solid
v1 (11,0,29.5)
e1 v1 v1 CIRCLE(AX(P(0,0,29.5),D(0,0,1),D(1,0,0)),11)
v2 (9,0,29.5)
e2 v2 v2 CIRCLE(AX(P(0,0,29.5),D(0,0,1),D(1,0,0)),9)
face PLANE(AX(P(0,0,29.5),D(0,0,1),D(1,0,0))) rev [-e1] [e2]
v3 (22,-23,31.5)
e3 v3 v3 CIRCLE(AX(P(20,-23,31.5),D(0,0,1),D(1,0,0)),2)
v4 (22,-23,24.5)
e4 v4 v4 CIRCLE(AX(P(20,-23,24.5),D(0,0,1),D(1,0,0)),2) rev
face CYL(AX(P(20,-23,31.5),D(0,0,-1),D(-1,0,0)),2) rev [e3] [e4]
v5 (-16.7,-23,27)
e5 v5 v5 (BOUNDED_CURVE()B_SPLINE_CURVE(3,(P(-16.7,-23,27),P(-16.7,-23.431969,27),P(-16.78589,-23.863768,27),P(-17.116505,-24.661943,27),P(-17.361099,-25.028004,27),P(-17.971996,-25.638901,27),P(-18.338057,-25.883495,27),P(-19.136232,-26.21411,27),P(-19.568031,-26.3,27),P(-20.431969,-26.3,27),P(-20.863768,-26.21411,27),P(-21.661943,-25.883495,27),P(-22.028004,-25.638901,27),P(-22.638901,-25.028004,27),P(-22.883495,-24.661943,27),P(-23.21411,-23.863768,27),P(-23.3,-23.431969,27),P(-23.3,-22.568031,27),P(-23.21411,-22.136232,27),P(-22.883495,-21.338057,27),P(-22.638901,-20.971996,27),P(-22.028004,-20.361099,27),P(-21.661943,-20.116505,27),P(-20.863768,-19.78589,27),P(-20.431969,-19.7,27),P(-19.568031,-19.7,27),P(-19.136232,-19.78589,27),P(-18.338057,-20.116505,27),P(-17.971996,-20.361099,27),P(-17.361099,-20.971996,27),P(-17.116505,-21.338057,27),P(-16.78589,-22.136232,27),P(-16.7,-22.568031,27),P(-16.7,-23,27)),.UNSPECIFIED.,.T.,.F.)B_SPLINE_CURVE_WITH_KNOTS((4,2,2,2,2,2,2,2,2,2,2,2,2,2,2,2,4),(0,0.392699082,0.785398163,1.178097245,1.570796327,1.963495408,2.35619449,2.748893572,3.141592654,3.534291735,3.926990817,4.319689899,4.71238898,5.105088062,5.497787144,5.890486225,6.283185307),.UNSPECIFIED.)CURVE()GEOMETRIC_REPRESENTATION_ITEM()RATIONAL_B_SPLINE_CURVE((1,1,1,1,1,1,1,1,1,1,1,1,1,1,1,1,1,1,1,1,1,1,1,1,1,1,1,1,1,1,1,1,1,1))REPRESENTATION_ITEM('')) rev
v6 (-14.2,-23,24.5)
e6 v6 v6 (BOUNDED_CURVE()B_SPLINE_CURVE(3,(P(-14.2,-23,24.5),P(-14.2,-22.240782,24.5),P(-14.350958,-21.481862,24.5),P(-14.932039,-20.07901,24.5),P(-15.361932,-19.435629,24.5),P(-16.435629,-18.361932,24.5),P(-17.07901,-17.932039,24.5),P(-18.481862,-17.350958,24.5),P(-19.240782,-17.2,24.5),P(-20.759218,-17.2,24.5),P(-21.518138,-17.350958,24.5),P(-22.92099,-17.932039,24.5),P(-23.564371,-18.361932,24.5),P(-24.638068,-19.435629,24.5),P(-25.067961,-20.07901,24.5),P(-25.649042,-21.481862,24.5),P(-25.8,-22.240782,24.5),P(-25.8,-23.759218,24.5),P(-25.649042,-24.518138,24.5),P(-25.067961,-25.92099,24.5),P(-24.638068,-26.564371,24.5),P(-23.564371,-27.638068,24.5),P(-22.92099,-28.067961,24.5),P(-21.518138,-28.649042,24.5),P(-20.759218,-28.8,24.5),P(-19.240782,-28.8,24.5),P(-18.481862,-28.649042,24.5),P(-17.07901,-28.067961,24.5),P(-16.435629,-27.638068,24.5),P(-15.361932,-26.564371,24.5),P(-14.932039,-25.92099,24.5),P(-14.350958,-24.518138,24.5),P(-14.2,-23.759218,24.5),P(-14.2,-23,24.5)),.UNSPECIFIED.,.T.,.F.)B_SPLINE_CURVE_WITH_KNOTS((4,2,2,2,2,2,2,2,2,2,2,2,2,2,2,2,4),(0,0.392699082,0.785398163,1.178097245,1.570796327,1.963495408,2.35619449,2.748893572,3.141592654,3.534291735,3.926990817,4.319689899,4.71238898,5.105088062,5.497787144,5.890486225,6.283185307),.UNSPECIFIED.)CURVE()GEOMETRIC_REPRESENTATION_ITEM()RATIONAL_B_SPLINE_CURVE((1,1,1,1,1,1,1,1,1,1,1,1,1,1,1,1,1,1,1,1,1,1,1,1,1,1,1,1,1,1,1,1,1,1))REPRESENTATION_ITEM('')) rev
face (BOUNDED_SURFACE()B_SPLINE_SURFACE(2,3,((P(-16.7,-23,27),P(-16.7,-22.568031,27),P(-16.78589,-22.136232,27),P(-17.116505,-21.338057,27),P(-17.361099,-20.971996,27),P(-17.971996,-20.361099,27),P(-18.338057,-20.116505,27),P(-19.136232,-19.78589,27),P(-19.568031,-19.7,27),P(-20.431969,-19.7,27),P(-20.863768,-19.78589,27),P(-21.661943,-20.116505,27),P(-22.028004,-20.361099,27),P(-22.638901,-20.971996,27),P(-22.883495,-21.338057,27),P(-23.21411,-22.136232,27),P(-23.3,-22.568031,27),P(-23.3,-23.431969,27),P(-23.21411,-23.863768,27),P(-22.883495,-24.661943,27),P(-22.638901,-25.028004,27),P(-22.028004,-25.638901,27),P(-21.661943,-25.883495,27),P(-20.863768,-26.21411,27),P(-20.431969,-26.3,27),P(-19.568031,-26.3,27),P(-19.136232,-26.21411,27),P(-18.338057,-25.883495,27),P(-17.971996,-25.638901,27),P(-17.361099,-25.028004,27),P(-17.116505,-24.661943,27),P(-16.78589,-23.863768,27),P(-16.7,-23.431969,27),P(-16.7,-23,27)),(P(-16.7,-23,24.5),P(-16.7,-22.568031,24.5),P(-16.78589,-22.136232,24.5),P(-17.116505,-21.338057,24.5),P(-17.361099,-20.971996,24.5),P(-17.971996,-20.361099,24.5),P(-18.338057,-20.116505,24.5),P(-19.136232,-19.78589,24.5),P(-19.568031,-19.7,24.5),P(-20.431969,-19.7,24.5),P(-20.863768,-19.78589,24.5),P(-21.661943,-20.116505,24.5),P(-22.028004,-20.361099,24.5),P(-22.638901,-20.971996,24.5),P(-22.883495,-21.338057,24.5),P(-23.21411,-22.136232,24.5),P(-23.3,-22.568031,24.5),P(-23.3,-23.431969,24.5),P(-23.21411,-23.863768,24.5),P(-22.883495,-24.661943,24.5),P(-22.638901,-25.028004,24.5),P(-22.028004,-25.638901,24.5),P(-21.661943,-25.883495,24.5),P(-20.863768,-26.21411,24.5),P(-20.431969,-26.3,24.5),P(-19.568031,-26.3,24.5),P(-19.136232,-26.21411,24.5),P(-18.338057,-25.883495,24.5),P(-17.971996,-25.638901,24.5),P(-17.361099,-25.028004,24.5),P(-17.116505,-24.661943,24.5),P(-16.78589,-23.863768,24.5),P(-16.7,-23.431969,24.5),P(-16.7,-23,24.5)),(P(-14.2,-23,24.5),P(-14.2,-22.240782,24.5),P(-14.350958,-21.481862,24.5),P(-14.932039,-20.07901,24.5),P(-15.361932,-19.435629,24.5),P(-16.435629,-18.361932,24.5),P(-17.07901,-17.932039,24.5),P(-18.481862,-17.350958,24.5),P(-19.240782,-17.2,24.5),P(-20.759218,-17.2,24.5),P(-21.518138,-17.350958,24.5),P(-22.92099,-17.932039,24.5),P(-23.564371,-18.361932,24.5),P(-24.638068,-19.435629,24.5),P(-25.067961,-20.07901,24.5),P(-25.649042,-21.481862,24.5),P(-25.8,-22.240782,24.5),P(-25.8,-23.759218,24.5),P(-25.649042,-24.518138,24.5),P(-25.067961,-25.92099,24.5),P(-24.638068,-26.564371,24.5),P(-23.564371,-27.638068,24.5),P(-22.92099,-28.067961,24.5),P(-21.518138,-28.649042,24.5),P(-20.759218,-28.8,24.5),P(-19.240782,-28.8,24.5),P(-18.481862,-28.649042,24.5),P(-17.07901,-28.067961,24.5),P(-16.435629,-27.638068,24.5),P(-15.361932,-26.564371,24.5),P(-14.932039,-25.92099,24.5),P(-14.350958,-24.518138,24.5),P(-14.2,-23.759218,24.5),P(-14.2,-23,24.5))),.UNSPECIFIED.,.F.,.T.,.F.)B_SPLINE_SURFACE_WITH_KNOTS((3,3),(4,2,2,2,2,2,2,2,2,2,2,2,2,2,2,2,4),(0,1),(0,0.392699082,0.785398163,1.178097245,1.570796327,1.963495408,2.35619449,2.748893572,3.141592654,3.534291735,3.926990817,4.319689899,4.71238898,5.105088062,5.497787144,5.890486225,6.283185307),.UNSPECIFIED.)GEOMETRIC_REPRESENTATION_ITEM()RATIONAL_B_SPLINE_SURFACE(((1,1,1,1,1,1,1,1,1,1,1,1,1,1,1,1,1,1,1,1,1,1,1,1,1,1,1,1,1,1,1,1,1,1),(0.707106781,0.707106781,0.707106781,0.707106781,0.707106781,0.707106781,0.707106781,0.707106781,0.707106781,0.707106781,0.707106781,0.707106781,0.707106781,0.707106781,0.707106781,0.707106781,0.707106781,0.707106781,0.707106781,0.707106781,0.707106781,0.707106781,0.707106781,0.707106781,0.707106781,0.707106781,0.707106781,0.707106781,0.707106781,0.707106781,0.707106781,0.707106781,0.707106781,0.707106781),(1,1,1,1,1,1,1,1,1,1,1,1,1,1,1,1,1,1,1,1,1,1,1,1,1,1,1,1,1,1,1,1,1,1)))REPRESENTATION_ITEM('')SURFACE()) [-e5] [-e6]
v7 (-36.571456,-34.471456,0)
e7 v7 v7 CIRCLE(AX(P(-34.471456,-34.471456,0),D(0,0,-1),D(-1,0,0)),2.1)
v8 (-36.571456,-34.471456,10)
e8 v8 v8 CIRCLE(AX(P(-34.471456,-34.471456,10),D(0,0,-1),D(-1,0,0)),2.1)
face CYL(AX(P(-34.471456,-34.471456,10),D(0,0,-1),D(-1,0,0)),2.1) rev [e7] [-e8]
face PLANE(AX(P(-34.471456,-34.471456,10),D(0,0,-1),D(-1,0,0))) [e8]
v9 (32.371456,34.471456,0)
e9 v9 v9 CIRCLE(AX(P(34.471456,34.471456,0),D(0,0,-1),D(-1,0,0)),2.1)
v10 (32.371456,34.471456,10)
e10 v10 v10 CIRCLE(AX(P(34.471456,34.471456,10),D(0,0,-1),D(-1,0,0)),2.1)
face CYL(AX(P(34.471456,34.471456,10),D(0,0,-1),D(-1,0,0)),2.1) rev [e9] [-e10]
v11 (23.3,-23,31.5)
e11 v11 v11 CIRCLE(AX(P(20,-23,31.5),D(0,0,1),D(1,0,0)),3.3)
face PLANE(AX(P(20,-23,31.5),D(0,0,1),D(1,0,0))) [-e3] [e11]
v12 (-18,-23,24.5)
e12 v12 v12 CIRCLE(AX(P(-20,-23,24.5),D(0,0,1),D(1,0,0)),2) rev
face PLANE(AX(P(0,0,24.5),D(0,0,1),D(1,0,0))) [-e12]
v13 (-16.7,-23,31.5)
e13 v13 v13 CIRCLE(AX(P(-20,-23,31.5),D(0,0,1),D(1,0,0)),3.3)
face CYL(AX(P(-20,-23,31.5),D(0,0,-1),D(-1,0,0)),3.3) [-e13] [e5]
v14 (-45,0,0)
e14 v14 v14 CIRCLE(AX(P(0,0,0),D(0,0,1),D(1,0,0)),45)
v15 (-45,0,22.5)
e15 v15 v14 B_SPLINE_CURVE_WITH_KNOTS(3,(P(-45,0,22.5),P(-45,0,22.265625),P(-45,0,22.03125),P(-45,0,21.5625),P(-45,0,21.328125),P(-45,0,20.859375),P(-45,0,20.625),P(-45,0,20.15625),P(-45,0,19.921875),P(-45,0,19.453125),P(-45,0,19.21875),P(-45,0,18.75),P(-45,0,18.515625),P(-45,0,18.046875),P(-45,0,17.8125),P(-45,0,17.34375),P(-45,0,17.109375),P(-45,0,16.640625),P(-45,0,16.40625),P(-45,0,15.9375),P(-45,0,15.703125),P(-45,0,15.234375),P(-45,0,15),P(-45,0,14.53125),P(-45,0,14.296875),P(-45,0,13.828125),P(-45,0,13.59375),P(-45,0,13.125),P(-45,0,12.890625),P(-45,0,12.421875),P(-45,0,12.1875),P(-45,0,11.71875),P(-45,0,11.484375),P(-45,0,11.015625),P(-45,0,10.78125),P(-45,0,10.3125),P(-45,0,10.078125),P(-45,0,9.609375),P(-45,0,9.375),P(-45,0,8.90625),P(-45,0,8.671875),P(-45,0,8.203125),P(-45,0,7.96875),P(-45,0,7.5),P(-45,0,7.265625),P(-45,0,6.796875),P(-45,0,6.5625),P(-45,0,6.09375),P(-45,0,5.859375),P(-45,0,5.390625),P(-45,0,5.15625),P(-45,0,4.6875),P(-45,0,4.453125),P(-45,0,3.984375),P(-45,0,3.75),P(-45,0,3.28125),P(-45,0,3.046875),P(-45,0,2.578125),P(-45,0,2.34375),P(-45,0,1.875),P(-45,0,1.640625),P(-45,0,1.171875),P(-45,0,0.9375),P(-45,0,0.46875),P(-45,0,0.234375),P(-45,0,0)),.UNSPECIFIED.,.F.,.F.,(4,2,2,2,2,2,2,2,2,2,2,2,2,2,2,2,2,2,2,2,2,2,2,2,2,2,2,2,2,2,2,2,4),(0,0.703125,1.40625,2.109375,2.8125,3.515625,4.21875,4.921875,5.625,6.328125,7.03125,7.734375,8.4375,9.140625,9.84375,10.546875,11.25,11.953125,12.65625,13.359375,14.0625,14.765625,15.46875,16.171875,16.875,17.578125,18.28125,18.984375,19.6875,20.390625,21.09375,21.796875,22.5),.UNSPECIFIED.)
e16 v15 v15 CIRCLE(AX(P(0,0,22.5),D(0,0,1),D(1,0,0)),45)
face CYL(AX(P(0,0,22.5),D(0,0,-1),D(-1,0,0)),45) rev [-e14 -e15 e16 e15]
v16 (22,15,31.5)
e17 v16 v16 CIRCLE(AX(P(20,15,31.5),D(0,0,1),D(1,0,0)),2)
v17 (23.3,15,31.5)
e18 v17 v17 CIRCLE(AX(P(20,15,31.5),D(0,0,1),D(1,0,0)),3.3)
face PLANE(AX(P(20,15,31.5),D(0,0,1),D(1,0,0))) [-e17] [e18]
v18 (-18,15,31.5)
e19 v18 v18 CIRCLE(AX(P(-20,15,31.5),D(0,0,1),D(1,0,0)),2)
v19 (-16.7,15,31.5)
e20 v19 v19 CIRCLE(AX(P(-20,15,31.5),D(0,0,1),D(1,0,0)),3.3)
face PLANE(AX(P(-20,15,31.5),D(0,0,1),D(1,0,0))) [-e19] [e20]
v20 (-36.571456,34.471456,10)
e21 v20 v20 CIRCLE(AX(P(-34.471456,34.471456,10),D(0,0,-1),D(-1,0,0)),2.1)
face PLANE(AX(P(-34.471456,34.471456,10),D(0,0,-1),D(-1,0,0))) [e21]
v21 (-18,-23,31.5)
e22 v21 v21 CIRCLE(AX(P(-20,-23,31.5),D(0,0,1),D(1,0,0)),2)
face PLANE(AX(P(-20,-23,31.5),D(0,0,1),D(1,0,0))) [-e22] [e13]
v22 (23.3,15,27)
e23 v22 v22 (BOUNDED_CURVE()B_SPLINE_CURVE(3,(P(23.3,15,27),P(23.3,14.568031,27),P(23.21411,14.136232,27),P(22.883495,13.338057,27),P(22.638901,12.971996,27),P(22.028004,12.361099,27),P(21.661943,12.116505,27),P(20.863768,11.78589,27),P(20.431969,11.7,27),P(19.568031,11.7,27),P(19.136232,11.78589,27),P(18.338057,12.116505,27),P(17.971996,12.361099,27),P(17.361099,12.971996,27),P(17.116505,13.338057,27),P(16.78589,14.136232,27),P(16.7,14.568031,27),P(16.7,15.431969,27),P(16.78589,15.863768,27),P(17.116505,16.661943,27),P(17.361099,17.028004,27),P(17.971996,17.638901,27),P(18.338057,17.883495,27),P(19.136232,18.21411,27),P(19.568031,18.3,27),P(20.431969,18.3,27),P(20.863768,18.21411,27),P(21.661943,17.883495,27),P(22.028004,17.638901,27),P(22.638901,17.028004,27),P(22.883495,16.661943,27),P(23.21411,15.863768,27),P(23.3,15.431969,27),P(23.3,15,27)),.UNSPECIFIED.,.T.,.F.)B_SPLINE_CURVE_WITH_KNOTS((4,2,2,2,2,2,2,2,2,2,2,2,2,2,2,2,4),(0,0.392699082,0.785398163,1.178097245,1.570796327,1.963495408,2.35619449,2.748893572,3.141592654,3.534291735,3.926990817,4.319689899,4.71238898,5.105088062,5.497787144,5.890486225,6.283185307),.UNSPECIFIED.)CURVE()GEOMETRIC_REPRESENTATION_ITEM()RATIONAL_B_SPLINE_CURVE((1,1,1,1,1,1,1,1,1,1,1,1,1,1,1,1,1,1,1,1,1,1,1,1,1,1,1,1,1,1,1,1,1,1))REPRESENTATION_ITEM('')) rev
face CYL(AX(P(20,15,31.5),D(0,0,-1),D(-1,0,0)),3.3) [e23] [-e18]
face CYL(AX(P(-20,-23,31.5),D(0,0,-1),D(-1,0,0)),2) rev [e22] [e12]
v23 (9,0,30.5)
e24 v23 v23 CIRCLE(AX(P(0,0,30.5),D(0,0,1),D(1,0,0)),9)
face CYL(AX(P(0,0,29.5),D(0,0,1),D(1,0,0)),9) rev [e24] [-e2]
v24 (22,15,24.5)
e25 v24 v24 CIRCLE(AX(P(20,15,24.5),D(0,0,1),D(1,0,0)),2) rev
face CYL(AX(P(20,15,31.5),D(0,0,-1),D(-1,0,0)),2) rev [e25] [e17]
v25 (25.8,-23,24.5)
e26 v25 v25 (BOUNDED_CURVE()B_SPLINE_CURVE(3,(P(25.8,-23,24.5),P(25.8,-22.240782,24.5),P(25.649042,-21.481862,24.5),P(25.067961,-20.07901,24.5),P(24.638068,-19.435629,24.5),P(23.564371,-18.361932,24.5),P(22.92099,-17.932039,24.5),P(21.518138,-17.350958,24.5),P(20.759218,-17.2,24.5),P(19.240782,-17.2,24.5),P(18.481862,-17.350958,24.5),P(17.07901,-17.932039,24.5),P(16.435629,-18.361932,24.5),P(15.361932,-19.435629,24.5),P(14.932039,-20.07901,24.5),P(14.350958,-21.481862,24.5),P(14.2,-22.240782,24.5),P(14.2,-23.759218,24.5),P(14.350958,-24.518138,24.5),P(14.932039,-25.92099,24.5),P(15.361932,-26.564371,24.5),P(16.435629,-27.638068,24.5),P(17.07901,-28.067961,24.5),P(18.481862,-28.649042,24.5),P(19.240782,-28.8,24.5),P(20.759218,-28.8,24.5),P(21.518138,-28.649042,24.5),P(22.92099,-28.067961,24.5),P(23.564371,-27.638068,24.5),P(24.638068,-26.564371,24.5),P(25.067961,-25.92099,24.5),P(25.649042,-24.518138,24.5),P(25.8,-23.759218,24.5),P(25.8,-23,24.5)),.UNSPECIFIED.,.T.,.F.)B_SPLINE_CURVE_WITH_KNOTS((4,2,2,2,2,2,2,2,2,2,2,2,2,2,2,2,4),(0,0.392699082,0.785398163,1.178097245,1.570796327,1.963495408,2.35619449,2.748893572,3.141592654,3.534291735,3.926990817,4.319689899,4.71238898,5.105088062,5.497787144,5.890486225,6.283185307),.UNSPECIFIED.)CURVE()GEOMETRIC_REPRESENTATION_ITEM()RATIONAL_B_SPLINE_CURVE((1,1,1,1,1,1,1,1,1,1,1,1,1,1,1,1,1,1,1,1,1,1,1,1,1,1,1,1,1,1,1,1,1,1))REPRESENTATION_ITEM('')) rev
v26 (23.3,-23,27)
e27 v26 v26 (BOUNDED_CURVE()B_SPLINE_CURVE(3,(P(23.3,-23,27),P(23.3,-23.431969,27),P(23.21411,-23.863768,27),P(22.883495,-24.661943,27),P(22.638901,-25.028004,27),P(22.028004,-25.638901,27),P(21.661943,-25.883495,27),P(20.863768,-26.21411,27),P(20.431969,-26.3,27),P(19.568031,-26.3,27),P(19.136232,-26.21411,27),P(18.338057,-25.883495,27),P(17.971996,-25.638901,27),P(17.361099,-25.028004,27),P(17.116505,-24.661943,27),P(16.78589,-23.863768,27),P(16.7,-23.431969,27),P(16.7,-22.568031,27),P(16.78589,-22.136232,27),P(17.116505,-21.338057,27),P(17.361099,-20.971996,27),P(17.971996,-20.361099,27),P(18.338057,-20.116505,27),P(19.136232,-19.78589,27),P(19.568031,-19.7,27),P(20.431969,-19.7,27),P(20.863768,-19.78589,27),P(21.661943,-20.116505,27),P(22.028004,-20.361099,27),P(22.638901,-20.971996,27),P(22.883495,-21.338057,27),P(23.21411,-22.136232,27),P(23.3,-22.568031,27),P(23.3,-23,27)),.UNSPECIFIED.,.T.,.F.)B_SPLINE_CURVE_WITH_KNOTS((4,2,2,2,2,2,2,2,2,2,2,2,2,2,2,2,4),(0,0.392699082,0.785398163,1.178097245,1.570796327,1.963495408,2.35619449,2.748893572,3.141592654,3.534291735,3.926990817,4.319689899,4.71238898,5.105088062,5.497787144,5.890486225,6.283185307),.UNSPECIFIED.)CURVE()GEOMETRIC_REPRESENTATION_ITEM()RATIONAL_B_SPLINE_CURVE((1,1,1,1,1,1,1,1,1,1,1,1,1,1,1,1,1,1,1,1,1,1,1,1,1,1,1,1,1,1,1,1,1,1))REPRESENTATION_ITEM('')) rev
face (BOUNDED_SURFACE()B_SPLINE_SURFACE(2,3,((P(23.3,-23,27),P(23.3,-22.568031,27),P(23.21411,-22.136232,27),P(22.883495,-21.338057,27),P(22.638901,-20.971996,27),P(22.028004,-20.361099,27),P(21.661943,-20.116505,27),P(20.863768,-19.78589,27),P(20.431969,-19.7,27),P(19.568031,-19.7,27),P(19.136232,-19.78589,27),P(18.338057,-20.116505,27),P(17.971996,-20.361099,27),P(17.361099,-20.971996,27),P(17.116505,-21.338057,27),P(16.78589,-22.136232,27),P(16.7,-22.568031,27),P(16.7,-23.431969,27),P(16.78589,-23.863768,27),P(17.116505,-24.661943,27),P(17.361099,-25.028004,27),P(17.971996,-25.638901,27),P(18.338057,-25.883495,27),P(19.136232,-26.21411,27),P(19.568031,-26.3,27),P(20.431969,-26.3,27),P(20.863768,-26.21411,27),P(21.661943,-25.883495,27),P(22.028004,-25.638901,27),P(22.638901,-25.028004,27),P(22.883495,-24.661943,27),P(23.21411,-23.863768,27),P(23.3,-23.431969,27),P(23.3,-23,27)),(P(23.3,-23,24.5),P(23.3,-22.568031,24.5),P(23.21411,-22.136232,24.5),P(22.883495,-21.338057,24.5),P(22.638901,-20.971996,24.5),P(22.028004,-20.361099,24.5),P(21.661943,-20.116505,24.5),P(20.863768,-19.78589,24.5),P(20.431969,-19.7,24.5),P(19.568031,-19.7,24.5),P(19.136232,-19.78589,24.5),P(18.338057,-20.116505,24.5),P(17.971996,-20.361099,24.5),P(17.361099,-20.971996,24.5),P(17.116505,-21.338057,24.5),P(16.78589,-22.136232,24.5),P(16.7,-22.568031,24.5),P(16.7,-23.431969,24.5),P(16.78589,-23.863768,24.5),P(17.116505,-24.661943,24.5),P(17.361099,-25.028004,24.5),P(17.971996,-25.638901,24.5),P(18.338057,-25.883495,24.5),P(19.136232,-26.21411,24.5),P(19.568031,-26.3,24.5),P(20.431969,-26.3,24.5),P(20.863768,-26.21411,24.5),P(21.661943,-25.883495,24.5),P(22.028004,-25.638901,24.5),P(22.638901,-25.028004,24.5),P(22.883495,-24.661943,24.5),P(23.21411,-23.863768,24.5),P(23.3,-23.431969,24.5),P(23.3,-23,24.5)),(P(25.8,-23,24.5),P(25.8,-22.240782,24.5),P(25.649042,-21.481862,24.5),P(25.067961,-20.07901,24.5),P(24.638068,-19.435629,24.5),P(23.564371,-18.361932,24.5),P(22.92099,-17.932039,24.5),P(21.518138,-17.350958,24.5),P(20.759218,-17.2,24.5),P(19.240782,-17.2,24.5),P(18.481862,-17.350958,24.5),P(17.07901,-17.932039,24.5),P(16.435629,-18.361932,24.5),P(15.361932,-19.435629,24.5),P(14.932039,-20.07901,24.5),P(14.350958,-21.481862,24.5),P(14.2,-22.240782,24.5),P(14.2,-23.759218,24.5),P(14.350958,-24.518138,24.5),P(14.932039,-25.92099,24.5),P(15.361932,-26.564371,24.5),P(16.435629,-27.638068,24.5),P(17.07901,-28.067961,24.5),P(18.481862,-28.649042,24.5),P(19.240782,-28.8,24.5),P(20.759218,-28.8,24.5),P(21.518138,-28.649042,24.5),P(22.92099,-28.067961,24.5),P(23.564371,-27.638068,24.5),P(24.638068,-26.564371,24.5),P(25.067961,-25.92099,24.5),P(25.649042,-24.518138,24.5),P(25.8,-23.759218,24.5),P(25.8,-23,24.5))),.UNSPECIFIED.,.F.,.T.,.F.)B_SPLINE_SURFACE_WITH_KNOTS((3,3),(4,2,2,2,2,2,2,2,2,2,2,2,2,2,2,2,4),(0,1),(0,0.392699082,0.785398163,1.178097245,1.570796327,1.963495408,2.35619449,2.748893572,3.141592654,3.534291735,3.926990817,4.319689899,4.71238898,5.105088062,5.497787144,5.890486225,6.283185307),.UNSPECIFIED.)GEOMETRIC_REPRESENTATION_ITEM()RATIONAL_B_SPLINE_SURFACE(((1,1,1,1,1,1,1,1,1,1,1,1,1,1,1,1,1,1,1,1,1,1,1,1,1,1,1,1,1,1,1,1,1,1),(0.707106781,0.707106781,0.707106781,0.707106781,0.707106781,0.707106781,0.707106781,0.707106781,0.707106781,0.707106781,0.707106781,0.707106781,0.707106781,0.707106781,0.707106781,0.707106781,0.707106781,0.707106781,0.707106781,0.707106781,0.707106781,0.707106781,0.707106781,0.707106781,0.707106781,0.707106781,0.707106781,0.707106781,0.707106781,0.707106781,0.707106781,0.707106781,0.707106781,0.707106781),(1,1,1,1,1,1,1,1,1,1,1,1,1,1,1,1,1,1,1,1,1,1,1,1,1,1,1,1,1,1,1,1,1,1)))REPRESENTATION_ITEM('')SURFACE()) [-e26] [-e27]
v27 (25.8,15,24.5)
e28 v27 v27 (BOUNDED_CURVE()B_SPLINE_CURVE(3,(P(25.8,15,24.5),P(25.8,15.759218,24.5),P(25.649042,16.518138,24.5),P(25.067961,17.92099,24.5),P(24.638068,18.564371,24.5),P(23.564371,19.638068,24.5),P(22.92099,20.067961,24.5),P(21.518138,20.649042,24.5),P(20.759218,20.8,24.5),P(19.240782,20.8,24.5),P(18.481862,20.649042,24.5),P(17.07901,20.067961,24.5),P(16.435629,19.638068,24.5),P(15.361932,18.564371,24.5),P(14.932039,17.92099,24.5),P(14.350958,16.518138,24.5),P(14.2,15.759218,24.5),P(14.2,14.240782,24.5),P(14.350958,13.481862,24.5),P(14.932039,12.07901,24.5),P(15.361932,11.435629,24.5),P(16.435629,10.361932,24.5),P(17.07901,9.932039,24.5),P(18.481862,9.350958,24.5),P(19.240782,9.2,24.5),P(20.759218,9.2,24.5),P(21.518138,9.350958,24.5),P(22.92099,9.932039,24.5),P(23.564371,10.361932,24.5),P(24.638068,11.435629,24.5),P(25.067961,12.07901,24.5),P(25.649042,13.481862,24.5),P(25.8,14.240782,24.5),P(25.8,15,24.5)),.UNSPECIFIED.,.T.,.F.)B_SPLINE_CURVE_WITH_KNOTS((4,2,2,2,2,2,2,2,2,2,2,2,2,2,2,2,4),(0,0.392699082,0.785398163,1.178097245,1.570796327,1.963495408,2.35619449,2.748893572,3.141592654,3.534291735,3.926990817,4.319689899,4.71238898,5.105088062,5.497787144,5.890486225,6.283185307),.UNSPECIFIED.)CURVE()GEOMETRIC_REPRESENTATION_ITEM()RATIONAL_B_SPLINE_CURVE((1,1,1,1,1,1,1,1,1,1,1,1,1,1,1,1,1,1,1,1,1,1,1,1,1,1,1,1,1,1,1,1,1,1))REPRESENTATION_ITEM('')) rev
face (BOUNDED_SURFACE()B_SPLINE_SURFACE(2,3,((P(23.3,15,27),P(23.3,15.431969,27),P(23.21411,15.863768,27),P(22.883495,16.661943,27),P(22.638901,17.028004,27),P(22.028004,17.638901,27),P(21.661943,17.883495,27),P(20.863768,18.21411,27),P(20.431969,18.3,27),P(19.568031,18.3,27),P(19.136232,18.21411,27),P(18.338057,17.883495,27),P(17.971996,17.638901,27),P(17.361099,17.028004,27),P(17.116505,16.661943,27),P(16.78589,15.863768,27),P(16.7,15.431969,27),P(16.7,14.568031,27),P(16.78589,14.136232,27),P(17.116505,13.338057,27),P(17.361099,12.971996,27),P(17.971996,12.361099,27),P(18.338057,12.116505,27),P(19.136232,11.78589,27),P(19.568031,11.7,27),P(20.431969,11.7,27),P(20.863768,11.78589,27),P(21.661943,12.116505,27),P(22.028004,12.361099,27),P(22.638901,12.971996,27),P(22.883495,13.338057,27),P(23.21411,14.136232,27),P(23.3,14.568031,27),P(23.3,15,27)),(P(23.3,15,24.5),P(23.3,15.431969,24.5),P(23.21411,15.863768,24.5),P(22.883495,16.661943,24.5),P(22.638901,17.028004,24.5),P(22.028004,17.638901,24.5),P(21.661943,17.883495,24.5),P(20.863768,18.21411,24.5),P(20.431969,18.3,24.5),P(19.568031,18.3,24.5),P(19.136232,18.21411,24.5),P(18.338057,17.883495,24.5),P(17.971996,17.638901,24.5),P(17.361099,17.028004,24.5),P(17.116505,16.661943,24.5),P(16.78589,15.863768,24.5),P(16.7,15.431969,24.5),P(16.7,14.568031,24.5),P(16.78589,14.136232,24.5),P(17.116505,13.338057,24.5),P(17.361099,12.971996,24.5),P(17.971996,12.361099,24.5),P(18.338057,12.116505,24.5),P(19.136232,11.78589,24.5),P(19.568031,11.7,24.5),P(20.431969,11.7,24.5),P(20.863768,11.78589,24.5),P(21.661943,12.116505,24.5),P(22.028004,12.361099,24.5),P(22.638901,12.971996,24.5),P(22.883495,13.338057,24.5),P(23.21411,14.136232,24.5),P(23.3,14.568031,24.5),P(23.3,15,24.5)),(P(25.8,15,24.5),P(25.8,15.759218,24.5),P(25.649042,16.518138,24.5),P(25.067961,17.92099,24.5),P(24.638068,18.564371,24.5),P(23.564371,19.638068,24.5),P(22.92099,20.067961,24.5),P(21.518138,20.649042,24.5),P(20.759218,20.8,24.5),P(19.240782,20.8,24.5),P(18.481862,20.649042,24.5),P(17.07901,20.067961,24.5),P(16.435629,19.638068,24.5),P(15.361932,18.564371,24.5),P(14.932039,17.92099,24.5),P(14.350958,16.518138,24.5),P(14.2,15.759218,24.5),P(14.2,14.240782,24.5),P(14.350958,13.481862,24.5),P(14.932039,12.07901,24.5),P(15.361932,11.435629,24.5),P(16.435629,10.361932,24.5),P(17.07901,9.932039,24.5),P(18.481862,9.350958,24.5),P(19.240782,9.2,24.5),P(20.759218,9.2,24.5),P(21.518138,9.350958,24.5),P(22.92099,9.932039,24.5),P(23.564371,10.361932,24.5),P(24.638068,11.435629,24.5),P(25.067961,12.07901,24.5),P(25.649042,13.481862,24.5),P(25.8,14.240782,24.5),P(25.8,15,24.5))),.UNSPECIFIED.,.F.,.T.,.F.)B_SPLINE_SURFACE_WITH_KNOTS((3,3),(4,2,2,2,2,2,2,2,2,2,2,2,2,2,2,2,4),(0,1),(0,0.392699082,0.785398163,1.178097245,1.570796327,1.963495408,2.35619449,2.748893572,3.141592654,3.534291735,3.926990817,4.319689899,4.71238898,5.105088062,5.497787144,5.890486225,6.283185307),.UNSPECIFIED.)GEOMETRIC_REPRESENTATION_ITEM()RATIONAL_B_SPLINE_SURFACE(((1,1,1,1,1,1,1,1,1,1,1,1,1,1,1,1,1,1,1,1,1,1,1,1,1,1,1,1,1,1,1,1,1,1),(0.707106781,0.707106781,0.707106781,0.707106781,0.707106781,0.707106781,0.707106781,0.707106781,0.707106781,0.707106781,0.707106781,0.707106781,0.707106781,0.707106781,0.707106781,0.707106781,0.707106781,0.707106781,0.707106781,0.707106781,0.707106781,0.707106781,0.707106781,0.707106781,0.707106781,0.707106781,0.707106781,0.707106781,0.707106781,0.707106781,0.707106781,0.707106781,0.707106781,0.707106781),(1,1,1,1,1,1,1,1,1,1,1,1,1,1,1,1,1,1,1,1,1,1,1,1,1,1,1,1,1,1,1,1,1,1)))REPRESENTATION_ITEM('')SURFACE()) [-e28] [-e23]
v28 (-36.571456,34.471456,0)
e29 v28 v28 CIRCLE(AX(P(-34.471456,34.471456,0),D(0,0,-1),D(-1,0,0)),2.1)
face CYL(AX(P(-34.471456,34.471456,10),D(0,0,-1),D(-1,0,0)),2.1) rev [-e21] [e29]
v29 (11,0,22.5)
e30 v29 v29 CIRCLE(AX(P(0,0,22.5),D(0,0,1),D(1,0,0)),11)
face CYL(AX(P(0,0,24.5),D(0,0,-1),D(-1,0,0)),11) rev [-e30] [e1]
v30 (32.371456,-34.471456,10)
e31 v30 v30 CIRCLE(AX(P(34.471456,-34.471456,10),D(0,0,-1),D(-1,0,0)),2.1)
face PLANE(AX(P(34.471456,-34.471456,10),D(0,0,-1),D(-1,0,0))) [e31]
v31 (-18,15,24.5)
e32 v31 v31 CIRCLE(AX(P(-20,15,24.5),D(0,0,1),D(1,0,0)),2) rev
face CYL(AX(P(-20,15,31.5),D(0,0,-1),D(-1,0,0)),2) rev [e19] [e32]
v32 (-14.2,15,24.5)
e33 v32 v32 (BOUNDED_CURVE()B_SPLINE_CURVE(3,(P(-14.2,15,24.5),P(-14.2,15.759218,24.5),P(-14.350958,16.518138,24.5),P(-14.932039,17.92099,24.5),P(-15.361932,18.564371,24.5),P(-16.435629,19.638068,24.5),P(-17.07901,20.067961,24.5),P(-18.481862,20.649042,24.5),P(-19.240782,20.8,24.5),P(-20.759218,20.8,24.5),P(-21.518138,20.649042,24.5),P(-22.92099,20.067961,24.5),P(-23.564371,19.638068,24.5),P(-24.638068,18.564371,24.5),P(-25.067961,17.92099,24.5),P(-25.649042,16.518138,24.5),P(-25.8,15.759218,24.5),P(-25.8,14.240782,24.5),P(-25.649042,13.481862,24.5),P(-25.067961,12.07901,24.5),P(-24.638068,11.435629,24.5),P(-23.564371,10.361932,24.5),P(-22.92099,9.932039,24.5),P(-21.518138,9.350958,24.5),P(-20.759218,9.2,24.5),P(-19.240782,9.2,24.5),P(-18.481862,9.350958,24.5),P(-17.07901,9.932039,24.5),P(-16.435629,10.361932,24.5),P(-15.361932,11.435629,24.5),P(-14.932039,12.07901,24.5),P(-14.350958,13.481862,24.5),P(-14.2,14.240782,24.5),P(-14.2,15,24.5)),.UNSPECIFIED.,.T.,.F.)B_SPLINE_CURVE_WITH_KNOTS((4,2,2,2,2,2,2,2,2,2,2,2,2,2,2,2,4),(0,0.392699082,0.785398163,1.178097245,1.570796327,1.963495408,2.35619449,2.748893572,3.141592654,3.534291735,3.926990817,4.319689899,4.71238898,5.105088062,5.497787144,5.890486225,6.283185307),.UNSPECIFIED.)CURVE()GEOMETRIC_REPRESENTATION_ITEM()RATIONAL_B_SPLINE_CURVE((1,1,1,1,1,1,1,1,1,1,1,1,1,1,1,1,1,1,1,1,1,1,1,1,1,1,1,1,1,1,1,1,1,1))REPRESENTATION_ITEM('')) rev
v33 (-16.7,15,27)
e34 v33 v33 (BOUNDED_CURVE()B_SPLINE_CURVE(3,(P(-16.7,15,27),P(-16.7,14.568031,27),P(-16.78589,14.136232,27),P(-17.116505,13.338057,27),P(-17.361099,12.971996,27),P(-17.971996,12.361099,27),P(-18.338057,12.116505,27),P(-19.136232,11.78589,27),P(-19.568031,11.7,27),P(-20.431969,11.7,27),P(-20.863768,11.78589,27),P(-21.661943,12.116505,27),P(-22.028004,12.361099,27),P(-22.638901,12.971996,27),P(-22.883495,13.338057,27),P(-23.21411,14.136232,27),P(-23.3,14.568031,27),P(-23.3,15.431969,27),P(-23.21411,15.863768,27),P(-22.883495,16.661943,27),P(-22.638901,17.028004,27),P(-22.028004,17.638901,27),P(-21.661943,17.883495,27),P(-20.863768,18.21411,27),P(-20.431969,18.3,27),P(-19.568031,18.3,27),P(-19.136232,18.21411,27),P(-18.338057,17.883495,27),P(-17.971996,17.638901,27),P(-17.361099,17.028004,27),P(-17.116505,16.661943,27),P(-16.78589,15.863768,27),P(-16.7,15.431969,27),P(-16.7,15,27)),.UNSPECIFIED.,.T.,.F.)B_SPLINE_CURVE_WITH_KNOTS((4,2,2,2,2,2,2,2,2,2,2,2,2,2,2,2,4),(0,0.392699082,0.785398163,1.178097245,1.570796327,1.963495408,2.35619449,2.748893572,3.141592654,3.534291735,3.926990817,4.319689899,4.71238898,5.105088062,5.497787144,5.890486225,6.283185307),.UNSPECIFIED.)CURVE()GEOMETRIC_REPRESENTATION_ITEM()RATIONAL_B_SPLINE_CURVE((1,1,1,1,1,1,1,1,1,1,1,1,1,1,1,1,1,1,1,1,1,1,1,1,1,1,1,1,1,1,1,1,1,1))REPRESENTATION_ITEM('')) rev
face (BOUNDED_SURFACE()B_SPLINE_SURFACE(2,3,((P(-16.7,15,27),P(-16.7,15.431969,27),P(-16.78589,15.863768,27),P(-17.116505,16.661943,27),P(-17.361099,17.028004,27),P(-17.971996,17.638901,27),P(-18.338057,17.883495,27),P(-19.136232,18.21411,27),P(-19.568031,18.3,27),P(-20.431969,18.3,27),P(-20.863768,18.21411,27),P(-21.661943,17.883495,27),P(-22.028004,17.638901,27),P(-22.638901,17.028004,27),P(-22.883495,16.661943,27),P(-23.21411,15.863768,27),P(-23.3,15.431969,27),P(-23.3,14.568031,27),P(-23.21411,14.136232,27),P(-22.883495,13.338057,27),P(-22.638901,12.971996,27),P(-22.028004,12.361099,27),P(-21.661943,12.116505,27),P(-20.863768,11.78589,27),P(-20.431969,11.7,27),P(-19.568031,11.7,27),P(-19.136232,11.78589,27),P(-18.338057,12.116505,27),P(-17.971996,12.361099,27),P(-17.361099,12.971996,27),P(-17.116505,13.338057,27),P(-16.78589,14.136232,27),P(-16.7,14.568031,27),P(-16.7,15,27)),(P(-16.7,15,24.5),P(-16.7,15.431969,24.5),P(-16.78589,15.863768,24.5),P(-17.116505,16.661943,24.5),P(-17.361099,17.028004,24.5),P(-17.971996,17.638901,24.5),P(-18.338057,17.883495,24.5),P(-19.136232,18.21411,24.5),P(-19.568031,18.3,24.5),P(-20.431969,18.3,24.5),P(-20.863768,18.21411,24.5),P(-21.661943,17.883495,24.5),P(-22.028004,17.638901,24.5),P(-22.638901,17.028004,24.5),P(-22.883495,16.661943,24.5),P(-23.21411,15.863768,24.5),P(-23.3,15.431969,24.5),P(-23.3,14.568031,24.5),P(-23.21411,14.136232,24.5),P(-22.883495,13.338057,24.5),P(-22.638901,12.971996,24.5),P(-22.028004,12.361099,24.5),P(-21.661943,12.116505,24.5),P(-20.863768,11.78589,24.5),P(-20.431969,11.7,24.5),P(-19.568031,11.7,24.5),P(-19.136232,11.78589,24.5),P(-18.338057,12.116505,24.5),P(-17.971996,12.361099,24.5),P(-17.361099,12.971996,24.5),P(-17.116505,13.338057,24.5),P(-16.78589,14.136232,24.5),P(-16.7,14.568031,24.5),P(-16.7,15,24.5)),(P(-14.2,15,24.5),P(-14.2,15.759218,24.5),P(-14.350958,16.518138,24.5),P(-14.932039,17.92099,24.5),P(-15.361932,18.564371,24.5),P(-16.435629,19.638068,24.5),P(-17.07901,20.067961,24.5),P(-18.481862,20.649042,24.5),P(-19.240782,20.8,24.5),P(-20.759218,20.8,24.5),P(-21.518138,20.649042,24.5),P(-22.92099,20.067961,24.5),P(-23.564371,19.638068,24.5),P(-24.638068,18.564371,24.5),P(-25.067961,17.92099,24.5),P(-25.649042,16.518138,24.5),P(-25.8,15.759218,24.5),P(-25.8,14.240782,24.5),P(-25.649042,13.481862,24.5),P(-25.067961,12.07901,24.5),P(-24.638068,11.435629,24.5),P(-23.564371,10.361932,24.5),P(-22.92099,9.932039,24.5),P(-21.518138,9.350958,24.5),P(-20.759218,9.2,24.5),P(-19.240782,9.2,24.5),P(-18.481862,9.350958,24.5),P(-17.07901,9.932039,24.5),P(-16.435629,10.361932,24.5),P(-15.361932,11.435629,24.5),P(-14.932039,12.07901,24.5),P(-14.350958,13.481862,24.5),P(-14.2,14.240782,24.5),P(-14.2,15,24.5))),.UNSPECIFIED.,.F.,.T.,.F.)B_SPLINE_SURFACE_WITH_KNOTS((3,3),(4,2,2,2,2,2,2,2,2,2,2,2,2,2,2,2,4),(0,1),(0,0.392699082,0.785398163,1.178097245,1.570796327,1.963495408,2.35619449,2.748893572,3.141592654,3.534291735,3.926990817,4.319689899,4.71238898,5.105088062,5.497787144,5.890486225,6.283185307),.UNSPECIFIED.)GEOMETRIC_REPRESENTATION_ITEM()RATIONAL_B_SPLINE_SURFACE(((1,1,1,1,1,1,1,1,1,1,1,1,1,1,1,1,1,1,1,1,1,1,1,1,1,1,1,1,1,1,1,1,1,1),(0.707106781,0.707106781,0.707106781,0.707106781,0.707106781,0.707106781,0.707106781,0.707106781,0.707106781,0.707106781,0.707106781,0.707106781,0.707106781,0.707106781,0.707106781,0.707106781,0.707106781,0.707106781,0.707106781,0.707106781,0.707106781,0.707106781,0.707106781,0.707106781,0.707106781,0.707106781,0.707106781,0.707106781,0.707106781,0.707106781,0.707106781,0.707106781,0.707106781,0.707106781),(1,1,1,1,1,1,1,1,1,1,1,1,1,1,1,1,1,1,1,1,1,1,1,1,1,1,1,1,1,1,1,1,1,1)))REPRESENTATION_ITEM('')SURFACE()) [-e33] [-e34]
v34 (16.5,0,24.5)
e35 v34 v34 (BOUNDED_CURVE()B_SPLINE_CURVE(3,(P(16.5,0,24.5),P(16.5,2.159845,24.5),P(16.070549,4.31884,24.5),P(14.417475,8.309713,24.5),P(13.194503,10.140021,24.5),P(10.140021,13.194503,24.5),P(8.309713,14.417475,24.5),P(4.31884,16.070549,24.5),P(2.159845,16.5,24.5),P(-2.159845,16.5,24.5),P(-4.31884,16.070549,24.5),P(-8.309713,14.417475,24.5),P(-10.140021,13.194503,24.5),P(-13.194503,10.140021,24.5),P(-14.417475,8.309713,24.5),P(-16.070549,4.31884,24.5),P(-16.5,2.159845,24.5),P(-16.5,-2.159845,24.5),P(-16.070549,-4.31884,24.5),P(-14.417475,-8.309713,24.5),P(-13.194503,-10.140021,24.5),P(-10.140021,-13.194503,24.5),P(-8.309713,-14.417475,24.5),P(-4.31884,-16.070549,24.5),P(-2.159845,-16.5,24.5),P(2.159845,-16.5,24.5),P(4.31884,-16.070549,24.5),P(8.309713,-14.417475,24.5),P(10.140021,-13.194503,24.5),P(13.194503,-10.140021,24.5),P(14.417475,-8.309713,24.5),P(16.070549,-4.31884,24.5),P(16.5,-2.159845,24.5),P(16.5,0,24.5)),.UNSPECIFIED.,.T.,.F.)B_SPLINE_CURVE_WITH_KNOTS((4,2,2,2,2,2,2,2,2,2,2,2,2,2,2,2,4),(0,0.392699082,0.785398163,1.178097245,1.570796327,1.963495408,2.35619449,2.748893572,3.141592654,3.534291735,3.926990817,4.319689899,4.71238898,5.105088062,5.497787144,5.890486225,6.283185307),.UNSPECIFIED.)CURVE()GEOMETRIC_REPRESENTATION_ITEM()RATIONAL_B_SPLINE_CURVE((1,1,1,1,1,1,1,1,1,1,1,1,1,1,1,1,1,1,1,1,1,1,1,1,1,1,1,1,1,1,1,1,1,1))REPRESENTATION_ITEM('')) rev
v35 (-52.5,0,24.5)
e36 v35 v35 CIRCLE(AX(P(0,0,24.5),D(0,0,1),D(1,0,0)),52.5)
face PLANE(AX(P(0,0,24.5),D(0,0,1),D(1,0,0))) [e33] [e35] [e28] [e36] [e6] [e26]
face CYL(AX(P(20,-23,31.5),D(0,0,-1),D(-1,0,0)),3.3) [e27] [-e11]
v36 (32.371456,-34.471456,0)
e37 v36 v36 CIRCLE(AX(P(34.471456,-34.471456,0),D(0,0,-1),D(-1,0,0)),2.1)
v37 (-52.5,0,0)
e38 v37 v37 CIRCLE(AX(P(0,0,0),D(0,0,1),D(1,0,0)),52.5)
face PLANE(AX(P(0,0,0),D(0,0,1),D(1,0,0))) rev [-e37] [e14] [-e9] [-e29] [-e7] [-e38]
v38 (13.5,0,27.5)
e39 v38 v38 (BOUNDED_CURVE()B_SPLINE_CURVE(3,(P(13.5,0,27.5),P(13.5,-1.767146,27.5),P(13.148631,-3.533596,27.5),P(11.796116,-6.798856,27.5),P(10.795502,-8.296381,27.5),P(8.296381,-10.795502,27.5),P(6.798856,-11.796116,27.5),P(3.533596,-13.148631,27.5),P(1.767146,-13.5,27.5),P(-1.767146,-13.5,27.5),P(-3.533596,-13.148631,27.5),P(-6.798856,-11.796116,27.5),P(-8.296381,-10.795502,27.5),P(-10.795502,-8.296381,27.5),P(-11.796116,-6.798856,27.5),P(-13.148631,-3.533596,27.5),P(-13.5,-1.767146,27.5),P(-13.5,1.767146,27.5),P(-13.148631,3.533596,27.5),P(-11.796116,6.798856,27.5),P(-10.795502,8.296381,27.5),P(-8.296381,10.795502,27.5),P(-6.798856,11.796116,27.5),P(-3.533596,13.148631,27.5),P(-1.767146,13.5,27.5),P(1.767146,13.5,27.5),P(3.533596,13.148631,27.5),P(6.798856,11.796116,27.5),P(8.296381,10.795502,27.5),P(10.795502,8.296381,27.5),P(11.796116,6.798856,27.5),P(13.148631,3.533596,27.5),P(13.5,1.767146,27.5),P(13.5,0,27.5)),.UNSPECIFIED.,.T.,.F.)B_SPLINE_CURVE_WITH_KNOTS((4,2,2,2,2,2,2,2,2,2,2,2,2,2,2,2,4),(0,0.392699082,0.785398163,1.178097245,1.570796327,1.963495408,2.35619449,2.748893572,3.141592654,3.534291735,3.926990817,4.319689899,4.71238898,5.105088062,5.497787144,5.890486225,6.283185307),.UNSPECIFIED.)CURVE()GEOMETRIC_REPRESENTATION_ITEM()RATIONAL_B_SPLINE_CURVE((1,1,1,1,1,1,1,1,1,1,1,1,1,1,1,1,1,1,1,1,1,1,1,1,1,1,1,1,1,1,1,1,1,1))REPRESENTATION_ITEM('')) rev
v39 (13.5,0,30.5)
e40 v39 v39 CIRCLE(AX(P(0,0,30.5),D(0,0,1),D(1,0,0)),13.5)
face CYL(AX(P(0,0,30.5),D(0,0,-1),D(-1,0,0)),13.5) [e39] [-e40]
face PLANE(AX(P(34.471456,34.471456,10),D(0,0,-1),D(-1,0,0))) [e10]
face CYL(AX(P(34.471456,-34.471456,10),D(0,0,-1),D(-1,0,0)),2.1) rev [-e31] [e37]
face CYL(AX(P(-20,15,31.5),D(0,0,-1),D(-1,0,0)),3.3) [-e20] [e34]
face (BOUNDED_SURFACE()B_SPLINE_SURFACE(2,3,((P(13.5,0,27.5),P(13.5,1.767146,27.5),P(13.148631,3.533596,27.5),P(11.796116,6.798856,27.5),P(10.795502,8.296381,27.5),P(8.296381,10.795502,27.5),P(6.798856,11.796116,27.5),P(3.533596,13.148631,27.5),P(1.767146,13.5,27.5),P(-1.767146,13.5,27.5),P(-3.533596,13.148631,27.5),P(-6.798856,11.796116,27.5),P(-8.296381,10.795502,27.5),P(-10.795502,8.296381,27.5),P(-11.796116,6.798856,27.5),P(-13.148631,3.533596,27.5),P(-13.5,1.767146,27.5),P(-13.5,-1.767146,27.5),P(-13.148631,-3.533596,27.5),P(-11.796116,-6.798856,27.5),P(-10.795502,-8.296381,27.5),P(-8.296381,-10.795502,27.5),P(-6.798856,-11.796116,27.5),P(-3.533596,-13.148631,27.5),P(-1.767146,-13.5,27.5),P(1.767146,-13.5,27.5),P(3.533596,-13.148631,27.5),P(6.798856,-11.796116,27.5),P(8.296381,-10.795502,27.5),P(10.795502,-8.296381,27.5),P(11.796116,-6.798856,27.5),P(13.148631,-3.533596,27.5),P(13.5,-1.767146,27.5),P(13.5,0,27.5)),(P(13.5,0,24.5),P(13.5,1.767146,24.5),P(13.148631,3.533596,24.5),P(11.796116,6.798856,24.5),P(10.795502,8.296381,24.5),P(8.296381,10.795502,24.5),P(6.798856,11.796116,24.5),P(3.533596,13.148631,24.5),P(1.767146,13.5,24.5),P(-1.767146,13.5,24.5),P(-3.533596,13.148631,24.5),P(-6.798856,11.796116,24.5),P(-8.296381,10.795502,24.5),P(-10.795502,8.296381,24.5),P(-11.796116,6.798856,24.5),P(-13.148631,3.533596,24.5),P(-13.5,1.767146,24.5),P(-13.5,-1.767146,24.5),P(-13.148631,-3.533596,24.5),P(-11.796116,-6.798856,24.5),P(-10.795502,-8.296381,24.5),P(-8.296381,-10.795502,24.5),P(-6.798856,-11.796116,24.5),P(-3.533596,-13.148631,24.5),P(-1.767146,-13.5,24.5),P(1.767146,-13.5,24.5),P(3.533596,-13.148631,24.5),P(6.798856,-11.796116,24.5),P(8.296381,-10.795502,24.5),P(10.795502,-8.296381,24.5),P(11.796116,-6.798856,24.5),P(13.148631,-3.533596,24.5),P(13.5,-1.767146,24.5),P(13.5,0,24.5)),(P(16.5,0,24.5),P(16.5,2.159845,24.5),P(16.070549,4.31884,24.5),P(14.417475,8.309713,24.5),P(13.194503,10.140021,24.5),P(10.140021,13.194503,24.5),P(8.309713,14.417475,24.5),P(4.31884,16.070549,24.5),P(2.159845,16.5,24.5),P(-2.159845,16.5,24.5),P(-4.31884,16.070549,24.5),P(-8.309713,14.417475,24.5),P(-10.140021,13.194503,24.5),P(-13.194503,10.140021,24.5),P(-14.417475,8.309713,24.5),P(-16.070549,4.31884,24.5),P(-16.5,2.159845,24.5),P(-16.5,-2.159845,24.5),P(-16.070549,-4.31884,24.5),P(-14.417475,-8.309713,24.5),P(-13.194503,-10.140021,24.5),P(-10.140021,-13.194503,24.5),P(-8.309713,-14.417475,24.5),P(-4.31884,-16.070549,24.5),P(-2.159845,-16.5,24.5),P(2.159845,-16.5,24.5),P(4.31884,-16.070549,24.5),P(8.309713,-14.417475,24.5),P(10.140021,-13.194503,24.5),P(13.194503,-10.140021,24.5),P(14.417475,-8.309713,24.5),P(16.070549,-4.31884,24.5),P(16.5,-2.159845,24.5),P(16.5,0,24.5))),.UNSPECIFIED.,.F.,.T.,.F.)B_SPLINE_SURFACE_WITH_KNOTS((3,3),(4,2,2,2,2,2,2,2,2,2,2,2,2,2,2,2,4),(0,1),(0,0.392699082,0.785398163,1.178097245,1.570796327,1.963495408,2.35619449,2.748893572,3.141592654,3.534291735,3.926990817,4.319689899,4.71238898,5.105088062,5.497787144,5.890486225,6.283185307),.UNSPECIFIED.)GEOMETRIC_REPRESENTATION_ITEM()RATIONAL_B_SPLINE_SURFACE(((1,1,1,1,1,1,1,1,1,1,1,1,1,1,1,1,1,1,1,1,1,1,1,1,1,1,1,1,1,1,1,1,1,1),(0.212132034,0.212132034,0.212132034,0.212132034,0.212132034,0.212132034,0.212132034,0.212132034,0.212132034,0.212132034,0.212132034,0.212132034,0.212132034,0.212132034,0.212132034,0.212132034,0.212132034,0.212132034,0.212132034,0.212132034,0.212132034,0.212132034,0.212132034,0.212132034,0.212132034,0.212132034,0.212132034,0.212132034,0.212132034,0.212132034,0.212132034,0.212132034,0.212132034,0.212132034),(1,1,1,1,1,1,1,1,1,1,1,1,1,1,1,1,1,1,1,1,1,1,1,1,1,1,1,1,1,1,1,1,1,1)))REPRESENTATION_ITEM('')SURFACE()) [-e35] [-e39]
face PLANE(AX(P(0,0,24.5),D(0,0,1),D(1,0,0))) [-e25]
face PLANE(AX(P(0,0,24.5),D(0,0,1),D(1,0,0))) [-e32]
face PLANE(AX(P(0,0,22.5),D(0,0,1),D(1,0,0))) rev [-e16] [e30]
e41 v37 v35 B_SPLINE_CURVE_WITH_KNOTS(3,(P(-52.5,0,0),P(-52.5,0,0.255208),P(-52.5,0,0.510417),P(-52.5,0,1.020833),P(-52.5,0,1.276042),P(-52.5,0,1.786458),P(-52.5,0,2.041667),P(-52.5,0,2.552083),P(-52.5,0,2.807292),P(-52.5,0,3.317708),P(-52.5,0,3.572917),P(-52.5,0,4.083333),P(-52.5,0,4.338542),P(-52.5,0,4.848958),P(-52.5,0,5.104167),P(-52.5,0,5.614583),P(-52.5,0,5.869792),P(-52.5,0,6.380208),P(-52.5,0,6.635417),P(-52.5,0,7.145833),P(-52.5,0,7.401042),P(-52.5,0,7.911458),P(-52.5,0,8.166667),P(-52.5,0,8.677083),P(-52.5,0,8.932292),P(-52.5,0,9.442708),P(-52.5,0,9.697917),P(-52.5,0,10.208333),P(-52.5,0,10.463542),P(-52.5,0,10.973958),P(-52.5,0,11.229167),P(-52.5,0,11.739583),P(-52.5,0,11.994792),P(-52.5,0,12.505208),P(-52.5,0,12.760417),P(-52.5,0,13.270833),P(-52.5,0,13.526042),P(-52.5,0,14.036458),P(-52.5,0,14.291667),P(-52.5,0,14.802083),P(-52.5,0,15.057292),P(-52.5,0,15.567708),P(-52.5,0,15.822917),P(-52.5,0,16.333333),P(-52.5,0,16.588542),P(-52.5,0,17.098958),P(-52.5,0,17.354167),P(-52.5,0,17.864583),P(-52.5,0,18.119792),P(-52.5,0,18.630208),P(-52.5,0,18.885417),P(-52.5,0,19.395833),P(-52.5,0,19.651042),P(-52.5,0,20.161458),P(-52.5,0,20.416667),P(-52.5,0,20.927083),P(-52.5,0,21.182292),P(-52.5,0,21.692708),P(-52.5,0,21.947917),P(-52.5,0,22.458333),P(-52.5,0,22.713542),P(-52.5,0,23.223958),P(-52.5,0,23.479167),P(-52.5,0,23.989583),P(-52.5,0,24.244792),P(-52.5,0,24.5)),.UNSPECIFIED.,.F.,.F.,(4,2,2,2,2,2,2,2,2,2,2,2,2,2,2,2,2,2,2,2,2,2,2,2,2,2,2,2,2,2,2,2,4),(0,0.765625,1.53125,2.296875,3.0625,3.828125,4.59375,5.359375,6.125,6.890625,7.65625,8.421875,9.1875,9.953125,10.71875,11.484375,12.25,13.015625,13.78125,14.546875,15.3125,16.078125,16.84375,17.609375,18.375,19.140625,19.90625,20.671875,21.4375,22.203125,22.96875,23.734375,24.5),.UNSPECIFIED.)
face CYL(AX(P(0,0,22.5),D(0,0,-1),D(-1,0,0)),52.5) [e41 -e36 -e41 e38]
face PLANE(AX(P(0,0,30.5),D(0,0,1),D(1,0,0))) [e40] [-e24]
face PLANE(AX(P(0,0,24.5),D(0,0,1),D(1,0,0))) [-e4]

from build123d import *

# Parameters (mm, degrees)
SKETCH1_R           = 52.5
SKETCH1_R_2         = 45
BOSS_EXTRUDE1_DEPTH = 22.5
BOSS_EXTRUDE2_START = 22.5
SKETCH1_2_R         = 52.5
SKETCH1_2_R_2       = 11
BOSS_EXTRUDE2_DEPTH = 2
SKETCH3_R           = 3.3
SKETCH3_R_2         = 2
BOSS_EXTRUDE3_DEPTH = 7
FILLET1_R           = 2.5
SKETCH4_R           = 13.5
SKETCH4_R_2         = 11
BOSS_EXTRUDE4_DEPTH = 6
BOSS_EXTRUDE5_START = -7
SKETCH5_R           = 11
SKETCH5_R_2         = 9
BOSS_EXTRUDE5_DEPTH = 1
SKETCH7_R           = 2.1
CUT_EXTRUDE1_DEPTH  = 10
FILLET2_SIZE        = 3


with BuildPart() as part:
    # Sketch1 → Boss-Extrude1 (new body)
    with BuildSketch(Plane.XY):
        with Locations(Location((0, 0, 0), (0, 0, 180))):
            Circle(SKETCH1_R)
        with Locations(Location((0, 0, 0), (0, 0, 180))):
            Circle(SKETCH1_R_2, mode=Mode.SUBTRACT)
    extrude(amount=BOSS_EXTRUDE1_DEPTH)

    # Sketch1<2> → Boss-Extrude2 (add)
    with BuildSketch(Plane.XY.offset(BOSS_EXTRUDE2_START)):
        with Locations(Location((0, 0, 0), (0, 0, 180))):
            Circle(SKETCH1_2_R)
        Circle(SKETCH1_2_R_2, mode=Mode.SUBTRACT)
    extrude(amount=BOSS_EXTRUDE2_DEPTH)

    # Sketch3 → Boss-Extrude3 (add)
    # profile 1 of 4: a face of its own
    with BuildSketch(Plane.XY.offset(24.5)):
        with Locations((-20, 15)):
            Circle(SKETCH3_R)
        with Locations((-20, 15)):
            Circle(SKETCH3_R_2, mode=Mode.SUBTRACT)
    # profile 2 of 4: a face of its own
    with BuildSketch(Plane.XY.offset(24.5)):
        with Locations((20, 15)):
            Circle(SKETCH3_R)
        with Locations((20, 15)):
            Circle(SKETCH3_R_2, mode=Mode.SUBTRACT)
    # profile 3 of 4: a face of its own
    with BuildSketch(Plane.XY.offset(24.5)):
        with Locations((20, -23)):
            Circle(SKETCH3_R)
        with Locations((20, -23)):
            Circle(SKETCH3_R_2, mode=Mode.SUBTRACT)
    # profile 4 of 4: a face of its own
    with BuildSketch(Plane.XY.offset(24.5)):
        with Locations((-20, -23)):
            Circle(SKETCH3_R)
        with Locations((-20, -23)):
            Circle(SKETCH3_R_2, mode=Mode.SUBTRACT)
    extrude(amount=BOSS_EXTRUDE3_DEPTH)

    # Fillet1
    fillet1_edges = [part.edges().sort_by_distance(p)[0] for p in [
        (-23.3, 15, 24.5),
        (16.7, 15, 24.5),
        (16.7, -23, 24.5),
        (-23.3, -23, 24.5),
    ]]
    fillet(fillet1_edges, radius=FILLET1_R)

    # Sketch4 → Boss-Extrude4 (add)
    with BuildSketch(Plane.XY.offset(24.5)):
        Circle(SKETCH4_R)
        Circle(SKETCH4_R_2, mode=Mode.SUBTRACT)
    extrude(amount=BOSS_EXTRUDE4_DEPTH)

    # Sketch5 → Boss-Extrude5 (add)
    with BuildSketch(Plane(origin=(0, 0, 22.5), x_dir=(-1, 0, 0), z_dir=(0, 0, -1)).offset(BOSS_EXTRUDE5_START)):
        with Locations(Location((0, 0, 0), (0, 0, 180))):
            Circle(SKETCH5_R)
        with Locations(Location((0, 0, 0), (0, 0, 180))):
            Circle(SKETCH5_R_2, mode=Mode.SUBTRACT)
    extrude(amount=-BOSS_EXTRUDE5_DEPTH)

    # Sketch7 → Cut-Extrude1 (cut)
    with BuildSketch(Plane(origin=(0, 0, 0), x_dir=(-1, 0, 0), z_dir=(0, 0, -1))):
        with Locations((-34.471455583, 34.471455583)):
            Circle(SKETCH7_R)
        with Locations((34.471455583, 34.471455583)):
            Circle(SKETCH7_R)
        with Locations((34.471455583, -34.471455583)):
            Circle(SKETCH7_R)
        with Locations((-34.471455583, -34.471455583)):
            Circle(SKETCH7_R)
    extrude(amount=-CUT_EXTRUDE1_DEPTH, mode=Mode.SUBTRACT)

    # Fillet2
    # a fillet whose section is not a circle: 3 mm, written as the material it adds along each edge
    with BuildSketch(Plane(origin=(0, 0, 24.5), x_dir=(1, 0, 0), z_dir=(0, -1, 0))) as fillet2_piece_1:
        with BuildLine():
            Bezier((13.5 + FILLET2_SIZE, 0), (13.5, 0), (13.5, FILLET2_SIZE), weights=[1, 0.212132034, 1])
            Line((13.5, FILLET2_SIZE), (13.5, 0))
            Line((13.5, 0), (13.5 + FILLET2_SIZE, 0))
        make_face()
    revolve(axis=Axis((0, 0, 24.5), (0, 0, 1)))


solid = part.part
